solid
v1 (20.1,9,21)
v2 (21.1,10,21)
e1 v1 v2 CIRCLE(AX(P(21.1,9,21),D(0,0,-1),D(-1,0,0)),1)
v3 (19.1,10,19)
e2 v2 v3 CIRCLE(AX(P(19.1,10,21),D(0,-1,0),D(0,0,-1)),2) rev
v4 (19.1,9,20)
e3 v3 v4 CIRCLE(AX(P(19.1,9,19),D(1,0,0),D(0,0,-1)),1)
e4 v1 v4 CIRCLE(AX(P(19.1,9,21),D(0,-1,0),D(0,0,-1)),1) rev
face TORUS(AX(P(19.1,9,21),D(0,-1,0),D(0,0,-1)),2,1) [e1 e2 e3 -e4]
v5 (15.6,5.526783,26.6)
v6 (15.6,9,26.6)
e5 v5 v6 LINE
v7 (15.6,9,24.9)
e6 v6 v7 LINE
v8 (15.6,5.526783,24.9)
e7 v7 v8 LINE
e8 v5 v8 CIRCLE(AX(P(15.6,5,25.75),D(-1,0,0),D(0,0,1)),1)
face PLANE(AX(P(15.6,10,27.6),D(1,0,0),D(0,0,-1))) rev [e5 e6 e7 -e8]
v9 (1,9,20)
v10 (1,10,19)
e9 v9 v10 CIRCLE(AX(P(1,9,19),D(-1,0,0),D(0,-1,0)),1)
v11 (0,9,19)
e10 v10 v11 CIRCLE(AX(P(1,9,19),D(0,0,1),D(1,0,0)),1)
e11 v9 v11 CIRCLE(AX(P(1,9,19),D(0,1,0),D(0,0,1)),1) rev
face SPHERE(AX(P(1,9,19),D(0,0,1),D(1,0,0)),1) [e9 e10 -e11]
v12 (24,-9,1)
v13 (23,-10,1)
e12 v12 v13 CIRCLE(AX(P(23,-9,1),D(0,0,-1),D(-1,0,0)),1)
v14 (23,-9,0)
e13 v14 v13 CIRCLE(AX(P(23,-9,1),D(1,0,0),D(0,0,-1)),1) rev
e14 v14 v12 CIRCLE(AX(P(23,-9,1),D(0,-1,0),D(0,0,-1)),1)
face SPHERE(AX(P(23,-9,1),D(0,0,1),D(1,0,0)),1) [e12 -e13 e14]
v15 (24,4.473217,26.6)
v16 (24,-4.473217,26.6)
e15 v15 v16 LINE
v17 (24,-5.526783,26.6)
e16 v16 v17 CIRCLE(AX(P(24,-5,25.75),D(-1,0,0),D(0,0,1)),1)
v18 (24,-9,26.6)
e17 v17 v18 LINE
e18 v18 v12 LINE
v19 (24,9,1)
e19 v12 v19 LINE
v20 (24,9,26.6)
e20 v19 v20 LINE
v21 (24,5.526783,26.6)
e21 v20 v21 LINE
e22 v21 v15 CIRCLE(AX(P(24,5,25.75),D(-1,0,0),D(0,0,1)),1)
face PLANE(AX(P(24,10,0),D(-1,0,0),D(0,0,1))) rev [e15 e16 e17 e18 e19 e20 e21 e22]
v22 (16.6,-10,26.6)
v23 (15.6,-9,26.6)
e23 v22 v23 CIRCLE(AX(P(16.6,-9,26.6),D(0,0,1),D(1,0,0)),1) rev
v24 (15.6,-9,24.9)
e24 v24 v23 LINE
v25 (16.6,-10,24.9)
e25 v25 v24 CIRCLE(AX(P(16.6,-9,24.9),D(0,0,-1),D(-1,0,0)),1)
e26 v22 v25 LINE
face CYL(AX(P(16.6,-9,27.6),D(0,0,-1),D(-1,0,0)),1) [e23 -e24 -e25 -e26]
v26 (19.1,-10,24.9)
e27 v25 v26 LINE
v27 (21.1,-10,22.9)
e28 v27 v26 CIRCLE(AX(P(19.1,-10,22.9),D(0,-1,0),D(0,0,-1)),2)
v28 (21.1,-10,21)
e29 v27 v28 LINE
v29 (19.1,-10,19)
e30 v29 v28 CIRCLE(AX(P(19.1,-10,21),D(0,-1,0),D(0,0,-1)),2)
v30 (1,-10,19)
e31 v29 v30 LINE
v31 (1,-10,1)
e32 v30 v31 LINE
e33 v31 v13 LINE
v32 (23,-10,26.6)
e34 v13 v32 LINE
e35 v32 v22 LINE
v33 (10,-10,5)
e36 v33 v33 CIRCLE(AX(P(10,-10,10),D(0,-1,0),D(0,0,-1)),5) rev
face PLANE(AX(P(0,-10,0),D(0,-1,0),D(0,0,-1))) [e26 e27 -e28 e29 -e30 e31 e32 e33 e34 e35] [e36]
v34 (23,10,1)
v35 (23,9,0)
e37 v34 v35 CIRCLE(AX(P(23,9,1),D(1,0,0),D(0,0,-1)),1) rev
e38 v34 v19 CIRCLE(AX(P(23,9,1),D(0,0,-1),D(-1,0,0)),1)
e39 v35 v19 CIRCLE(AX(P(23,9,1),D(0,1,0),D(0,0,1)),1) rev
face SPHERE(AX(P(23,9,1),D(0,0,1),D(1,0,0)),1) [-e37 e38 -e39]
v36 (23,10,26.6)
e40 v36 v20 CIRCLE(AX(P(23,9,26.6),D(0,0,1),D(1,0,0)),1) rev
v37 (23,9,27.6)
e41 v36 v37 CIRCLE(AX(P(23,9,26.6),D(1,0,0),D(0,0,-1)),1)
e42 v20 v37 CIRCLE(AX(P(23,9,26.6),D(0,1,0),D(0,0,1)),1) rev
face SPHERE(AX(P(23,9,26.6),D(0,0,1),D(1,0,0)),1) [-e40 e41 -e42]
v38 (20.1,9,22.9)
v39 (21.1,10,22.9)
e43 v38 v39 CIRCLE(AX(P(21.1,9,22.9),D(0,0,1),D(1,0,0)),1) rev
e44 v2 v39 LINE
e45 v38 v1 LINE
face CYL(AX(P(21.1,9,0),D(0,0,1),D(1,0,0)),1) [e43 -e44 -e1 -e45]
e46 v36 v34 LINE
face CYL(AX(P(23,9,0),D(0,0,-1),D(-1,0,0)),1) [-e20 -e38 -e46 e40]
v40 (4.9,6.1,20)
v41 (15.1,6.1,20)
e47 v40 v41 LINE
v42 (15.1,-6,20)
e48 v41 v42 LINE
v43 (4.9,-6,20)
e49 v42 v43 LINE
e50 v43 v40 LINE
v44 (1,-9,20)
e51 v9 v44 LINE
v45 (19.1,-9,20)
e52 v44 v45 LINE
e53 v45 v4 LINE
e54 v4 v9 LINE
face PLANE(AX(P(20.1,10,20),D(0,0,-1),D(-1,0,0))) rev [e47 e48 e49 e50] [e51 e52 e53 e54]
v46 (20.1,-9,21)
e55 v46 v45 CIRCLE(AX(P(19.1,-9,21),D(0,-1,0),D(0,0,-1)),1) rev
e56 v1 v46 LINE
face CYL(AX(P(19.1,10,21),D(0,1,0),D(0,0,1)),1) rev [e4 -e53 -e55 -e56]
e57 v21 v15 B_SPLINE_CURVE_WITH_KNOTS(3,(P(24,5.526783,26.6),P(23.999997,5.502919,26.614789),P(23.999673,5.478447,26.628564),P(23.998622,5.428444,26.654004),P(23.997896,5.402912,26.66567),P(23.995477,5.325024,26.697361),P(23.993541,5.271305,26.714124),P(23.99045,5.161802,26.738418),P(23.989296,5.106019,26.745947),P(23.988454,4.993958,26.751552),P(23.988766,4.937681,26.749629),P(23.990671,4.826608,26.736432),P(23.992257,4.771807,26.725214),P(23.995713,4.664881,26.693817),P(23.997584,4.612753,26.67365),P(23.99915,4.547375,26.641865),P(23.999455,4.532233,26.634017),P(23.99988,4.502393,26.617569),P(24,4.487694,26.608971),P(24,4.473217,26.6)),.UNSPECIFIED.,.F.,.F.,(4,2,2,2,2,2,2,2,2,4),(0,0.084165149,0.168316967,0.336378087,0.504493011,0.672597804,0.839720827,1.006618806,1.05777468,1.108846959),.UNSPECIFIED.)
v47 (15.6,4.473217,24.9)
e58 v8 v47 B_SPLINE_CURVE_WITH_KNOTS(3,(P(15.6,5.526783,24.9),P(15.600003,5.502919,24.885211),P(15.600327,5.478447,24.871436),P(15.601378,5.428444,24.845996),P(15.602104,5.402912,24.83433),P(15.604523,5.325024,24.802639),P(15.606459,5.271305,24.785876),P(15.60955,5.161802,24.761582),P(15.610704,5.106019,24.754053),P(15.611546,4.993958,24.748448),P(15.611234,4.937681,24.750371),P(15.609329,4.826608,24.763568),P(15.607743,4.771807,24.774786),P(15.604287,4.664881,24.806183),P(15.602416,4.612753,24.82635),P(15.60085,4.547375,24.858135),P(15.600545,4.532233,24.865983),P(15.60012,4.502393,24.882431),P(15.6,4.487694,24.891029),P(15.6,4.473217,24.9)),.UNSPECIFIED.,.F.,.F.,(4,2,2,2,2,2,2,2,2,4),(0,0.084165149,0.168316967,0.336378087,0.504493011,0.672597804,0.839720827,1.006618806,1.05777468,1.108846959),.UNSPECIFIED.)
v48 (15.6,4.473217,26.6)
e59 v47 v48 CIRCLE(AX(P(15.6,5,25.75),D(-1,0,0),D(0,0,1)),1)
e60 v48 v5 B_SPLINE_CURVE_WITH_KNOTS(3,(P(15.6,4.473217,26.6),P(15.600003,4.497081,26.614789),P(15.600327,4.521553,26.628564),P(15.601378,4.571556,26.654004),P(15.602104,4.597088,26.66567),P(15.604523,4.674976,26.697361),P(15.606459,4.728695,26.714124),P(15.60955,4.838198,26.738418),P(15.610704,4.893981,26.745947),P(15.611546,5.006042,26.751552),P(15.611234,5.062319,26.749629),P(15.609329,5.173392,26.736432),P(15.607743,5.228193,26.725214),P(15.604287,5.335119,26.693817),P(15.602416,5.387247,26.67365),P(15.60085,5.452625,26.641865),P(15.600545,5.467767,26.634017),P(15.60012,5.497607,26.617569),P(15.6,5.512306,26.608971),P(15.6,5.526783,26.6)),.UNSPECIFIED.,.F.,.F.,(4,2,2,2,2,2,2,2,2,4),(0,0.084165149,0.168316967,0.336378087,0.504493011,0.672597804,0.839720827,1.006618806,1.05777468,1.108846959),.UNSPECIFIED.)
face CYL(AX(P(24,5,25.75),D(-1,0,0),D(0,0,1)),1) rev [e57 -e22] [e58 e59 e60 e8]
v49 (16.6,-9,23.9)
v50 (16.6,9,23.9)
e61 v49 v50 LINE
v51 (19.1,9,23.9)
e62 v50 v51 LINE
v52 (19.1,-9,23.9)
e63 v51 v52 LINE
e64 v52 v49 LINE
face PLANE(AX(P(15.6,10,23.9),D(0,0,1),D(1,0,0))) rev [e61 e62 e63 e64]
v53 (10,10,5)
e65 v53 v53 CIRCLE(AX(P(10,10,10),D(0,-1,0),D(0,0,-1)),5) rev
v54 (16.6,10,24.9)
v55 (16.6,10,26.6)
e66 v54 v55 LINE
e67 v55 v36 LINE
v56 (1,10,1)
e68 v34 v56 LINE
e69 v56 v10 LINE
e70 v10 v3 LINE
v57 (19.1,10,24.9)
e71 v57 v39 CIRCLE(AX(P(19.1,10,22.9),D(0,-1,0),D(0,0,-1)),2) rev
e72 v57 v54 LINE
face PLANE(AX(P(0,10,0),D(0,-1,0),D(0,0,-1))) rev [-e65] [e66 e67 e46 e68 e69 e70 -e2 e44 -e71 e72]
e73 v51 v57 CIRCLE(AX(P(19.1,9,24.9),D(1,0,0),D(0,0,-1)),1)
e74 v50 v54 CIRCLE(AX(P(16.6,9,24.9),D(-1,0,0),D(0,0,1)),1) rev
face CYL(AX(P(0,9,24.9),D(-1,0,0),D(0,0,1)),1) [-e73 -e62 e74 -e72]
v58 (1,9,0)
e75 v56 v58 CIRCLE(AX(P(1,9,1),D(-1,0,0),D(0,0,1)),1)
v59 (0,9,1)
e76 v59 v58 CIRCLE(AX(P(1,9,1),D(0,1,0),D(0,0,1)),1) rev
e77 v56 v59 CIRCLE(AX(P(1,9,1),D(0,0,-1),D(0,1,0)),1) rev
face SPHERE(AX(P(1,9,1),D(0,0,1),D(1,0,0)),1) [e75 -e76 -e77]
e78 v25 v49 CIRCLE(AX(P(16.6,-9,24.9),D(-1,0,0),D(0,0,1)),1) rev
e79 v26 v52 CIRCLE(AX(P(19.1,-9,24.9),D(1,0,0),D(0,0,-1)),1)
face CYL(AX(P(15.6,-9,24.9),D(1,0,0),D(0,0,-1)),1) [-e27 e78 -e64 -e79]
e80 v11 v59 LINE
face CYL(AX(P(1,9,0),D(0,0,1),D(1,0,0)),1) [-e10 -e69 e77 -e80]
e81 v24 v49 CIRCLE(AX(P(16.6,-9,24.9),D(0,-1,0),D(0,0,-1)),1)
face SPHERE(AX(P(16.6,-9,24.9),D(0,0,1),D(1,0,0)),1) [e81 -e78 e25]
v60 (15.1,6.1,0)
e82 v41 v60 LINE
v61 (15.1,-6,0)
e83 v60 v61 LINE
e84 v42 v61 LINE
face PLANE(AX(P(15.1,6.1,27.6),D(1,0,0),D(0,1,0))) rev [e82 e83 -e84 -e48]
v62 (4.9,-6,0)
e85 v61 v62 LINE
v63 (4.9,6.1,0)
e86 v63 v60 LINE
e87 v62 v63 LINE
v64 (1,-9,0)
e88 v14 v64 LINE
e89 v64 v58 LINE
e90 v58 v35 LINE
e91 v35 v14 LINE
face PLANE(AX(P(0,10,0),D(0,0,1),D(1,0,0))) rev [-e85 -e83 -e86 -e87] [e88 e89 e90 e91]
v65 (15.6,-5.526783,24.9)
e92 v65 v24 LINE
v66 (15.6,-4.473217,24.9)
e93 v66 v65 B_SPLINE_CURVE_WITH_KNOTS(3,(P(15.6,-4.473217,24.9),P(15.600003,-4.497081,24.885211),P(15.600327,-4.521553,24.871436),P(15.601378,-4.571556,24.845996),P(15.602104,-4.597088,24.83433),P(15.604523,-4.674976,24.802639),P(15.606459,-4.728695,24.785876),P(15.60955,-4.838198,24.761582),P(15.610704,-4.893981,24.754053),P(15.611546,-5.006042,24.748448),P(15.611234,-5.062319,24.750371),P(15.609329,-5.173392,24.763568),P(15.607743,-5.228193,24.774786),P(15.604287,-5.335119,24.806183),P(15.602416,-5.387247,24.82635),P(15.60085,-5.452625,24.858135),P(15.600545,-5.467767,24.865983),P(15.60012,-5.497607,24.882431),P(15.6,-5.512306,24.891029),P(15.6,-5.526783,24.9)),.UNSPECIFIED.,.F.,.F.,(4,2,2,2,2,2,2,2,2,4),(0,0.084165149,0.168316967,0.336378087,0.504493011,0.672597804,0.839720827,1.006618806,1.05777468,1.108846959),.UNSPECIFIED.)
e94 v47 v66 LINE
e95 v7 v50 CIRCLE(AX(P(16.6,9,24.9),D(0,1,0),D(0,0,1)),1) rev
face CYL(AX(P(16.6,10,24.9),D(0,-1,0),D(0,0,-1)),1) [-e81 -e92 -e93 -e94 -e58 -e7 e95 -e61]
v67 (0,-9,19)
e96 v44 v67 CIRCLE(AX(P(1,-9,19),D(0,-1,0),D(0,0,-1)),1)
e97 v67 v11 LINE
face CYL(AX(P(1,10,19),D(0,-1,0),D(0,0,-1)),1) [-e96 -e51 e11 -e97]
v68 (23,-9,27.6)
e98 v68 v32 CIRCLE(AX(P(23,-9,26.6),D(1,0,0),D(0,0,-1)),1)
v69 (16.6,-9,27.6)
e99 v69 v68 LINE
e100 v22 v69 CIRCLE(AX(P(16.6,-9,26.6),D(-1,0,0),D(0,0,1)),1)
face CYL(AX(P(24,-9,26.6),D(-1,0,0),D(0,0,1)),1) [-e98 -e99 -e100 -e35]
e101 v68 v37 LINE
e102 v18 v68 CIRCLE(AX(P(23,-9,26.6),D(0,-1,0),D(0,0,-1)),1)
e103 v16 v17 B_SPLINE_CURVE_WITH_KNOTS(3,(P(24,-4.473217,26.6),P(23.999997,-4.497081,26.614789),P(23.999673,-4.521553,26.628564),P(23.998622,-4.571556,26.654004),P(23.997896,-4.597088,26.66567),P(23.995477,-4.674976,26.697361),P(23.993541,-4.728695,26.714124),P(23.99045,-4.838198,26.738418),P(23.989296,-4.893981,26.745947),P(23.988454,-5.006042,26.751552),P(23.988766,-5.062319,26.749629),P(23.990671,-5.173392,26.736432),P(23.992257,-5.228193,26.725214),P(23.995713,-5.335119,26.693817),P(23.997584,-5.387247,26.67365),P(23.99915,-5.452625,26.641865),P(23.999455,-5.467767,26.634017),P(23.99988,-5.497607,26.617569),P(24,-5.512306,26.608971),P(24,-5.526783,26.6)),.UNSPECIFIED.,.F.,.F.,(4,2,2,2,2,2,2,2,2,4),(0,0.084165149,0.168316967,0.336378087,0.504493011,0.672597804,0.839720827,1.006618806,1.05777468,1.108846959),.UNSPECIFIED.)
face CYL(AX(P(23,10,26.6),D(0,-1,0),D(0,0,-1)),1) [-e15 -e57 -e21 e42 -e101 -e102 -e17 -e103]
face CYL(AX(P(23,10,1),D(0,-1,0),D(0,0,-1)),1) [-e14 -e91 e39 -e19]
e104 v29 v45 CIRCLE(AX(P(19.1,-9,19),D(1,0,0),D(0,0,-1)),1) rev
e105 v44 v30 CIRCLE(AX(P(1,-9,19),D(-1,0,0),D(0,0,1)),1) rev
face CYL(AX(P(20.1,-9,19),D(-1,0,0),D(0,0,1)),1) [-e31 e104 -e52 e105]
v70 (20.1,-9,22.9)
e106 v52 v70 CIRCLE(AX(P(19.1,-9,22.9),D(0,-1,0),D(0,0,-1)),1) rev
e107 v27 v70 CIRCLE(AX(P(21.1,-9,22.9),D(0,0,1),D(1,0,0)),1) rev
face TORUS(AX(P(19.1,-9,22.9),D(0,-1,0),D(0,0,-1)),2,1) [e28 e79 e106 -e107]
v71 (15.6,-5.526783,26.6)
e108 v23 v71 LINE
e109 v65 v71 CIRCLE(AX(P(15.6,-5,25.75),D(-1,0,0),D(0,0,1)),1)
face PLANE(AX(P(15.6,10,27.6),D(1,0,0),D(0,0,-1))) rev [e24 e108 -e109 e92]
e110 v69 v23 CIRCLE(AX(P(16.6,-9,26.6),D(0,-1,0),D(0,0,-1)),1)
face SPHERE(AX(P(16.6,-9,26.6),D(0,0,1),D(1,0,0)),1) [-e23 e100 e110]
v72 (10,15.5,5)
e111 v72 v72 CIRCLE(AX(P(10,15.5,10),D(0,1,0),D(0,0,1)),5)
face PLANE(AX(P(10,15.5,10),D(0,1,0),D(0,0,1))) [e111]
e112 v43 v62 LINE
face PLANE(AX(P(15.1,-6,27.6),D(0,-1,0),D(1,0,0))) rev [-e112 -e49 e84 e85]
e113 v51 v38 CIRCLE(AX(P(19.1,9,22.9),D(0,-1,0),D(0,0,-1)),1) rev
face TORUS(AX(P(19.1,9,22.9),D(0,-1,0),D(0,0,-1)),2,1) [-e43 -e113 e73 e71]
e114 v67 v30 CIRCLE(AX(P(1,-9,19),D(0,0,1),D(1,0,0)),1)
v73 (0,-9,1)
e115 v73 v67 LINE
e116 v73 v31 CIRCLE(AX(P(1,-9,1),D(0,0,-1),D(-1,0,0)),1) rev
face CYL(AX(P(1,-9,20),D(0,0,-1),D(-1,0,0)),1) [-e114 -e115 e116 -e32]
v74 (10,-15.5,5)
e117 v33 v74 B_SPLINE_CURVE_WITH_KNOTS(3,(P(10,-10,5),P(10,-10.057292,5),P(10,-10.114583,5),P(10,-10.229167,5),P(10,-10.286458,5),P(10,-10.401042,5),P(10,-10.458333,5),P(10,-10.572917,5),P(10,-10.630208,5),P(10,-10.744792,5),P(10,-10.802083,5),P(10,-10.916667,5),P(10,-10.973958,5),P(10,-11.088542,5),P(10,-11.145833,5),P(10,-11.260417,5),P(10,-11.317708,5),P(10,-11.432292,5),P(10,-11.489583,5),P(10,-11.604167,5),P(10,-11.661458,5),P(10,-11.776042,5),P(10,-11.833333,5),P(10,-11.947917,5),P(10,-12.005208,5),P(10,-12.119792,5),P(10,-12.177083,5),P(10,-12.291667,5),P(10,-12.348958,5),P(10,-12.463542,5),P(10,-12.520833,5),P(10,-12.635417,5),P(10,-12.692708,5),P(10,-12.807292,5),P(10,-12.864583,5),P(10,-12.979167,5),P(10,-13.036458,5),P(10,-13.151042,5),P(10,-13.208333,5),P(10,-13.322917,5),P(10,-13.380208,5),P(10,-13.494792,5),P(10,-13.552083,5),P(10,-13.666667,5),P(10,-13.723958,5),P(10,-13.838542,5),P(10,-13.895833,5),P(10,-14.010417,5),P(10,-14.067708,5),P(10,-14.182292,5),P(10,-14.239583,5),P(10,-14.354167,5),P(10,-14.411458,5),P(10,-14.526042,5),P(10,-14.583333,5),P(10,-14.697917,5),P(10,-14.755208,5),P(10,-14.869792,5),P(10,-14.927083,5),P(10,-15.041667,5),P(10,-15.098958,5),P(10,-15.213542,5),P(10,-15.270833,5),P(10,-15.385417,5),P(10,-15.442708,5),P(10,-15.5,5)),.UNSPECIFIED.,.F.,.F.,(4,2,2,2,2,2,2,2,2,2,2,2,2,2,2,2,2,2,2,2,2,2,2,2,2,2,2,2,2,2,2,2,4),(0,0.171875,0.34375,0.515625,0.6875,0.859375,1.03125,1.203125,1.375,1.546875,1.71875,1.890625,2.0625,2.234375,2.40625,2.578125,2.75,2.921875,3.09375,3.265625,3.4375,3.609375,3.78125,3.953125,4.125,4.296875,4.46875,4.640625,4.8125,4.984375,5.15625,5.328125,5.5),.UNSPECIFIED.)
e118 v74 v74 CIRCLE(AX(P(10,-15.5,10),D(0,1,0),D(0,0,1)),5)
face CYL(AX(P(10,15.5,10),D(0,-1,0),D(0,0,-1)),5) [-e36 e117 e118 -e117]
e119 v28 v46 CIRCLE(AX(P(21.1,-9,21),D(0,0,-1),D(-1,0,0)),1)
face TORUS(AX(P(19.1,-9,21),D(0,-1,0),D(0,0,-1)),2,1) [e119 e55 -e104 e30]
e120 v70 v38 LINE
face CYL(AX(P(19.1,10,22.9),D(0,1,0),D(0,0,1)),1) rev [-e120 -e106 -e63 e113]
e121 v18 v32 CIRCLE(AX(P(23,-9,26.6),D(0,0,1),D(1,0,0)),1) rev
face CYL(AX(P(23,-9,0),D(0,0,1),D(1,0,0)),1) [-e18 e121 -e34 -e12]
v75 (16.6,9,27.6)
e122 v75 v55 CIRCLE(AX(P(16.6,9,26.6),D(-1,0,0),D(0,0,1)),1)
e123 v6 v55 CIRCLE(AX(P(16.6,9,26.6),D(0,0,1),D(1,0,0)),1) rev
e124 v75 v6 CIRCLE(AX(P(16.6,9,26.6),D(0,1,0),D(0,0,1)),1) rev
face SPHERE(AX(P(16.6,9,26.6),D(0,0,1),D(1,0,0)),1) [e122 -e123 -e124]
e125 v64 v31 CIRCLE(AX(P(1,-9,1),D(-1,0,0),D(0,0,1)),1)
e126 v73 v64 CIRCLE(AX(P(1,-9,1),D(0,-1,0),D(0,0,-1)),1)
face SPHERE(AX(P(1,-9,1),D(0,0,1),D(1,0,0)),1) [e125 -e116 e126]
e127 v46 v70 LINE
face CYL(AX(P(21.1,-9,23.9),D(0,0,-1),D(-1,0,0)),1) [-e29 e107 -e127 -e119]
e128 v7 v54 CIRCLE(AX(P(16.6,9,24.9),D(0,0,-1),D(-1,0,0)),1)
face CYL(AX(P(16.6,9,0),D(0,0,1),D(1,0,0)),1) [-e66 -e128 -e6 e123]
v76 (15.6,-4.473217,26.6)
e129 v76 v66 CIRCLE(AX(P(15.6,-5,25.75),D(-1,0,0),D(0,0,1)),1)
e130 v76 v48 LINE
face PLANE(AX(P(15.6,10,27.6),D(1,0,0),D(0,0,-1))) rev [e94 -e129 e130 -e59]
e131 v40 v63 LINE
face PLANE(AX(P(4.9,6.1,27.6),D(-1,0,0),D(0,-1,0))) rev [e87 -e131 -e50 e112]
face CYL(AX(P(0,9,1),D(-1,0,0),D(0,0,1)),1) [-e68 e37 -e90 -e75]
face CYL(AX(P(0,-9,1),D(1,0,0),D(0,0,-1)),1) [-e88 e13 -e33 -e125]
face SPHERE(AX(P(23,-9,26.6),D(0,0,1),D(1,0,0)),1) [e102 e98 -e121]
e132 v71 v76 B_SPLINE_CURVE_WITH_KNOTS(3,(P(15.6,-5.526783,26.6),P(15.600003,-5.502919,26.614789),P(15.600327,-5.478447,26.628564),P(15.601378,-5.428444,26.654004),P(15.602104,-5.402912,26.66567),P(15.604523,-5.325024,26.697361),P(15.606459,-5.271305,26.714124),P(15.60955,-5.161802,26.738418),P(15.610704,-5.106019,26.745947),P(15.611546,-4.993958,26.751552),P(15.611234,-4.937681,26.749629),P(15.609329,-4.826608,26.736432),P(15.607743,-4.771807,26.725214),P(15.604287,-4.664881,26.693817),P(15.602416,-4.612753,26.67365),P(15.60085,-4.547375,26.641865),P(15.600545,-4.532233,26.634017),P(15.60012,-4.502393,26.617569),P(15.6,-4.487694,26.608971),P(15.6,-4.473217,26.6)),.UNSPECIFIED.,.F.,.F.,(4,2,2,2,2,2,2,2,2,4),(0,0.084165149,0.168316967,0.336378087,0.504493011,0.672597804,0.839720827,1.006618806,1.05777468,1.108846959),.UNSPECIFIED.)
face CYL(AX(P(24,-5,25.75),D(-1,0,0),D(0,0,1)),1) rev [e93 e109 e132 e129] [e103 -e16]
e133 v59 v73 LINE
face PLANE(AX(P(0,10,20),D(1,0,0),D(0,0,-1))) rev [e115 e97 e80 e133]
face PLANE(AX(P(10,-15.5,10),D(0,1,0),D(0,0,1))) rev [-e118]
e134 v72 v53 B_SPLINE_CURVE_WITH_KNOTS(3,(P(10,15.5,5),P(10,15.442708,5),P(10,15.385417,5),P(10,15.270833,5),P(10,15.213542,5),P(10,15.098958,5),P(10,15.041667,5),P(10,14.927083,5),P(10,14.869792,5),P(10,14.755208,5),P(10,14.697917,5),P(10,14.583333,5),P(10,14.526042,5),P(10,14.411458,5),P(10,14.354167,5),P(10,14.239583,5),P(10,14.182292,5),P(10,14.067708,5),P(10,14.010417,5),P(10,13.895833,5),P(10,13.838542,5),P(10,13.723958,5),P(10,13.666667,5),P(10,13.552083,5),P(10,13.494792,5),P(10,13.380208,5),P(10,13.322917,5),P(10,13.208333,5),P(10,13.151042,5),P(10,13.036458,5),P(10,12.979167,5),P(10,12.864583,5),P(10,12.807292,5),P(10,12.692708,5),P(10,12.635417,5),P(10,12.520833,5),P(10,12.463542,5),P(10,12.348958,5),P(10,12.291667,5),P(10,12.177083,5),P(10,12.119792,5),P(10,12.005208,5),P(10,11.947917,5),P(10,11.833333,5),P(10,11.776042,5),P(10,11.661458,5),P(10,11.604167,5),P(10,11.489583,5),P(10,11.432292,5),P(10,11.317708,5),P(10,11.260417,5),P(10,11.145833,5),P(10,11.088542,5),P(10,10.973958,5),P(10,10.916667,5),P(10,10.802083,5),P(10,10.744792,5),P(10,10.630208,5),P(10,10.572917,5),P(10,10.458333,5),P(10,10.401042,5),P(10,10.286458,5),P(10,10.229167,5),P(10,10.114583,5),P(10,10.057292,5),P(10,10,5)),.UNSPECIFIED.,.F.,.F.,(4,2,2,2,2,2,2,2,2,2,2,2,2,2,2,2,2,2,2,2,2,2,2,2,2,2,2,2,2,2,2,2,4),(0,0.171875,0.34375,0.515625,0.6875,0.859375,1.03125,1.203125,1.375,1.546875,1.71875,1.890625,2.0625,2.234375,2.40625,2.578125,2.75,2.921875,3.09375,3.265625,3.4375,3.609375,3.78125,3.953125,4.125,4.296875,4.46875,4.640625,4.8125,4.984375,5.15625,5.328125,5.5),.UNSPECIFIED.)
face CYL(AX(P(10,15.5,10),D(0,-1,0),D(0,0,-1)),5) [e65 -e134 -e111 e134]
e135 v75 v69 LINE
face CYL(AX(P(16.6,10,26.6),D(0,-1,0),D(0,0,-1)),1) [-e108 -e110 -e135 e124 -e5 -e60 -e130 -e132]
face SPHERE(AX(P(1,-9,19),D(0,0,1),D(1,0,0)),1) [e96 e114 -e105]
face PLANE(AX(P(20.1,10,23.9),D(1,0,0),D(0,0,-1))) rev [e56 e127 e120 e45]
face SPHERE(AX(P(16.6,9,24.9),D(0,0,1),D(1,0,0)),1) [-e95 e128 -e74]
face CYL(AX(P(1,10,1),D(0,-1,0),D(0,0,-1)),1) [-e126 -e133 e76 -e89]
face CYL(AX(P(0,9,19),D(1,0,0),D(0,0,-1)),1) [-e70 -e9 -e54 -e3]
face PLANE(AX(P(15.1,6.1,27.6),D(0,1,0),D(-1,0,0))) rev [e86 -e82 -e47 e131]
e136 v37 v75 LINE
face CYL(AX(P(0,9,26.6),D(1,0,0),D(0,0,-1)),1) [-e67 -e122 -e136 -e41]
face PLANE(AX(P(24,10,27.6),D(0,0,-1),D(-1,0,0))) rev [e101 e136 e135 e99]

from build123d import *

# Parameters (mm, degrees)
EXTRUDE_1_DEPTH     = 10
SKETCH_3_R          = 5
EXTRUDE_2_DEPTH     = 15.5
SKETCH_2_W          = 10.2
SKETCH_2_H          = 12.1
CUT_EXTRUDE_1_DEPTH = 40.724174
SKETCH_4_R          = 1
CUT_EXTRUDE_2_DEPTH = 36.289800226
FILLET_1_R          = 1


with BuildPart() as part:
    # 草图1 → 凸台-拉伸1 (new, symmetric)
    with BuildSketch(Plane(origin=(0, 0, 0), x_dir=(1, 0, 0), z_dir=(0, 1, 0))):
        Polygon((0, 0), (24, 0), (24, -27.6), (15.6, -27.6), (15.6, -23.9), (20.1, -23.9), (20.1, -20), (0, -20), align=None)
    extrude(amount=EXTRUDE_1_DEPTH, both=True)

    # 草图3 → 凸台-拉伸2 (add, symmetric)
    with BuildSketch(Plane(origin=(0, 0, 0), x_dir=(1, 0, 0), z_dir=(0, 1, 0))):
        with Locations(Location((10, -10, 0), (0, 0, 90))):
            Circle(SKETCH_3_R)
    extrude(amount=EXTRUDE_2_DEPTH, both=True)

    # 草图2 → 切除-拉伸1 (cut, through all)
    with BuildSketch(Plane(origin=(0, 0, 0), x_dir=(-1, 0, 0), z_dir=(0, 0, -1))):
        with Locations((-10, 0.05)):
            Rectangle(SKETCH_2_W, SKETCH_2_H)
    extrude(amount=-CUT_EXTRUDE_1_DEPTH, mode=Mode.SUBTRACT)

    # 草图4 → 切除-拉伸2 (cut, through all)
    with BuildSketch(Plane.ZY.offset(-15.6)):
        with Locations((25.75, 5)):
            Circle(SKETCH_4_R)
        with Locations((25.75, -5)):
            Circle(SKETCH_4_R)
    extrude(amount=-CUT_EXTRUDE_2_DEPTH, mode=Mode.SUBTRACT)

    # 圆角1
    # the kernel refuses this fillet: 1 mm, written as the material it adds along each edge
    with BuildSketch(Plane(origin=(20.1, 10, 23.9), x_dir=(0, 0, -1), z_dir=(0, -1, 0))) as fillet_1_piece_1:
        with BuildLine():
            CenterArc((FILLET_1_R, -FILLET_1_R), FILLET_1_R, 90, 90)
            Line((0, -FILLET_1_R), (0, 0))
            Line((0, 0), (FILLET_1_R, 0))
        make_face()
    extrude(amount=20)
    with BuildSketch(Plane(origin=(20.1, -10, 20), x_dir=(-1, 0, 0), z_dir=(0, 1, 0))) as fillet_1_piece_2:
        with BuildLine():
            CenterArc((FILLET_1_R, FILLET_1_R), FILLET_1_R, 180, 90)
            Line((0, FILLET_1_R), (0, 0))
            Line((0, 0), (FILLET_1_R, 0))
        make_face()
    extrude(amount=20)
    # the kernel refuses this fillet: 1 mm, written as the material it takes off along each edge
    with BuildSketch(Plane(origin=(1, -9, 1), x_dir=(-1, 0, 0), z_dir=(0, 0, -1))) as fillet_1_2_piece_1_section:
        Polygon((0, 0), (FILLET_1_R, 0), (FILLET_1_R, -FILLET_1_R), (0, -FILLET_1_R), align=None)
    fillet_1_2_piece_1 = extrude(amount=FILLET_1_R, mode=Mode.PRIVATE)
    fillet_1_2_piece_1 = fillet_1_2_piece_1 - Plane(origin=(1, -9, 1), x_dir=(0.7071067811865475, 0.7071067811865475, 0), z_dir=(0, 0, -1)) * Sphere(FILLET_1_R, mode=Mode.PRIVATE)
    add(fillet_1_2_piece_1, mode=Mode.SUBTRACT)
    with BuildSketch(Plane(origin=(1, 9, 1), x_dir=(-1, 0, 0), z_dir=(0, 0, -1))) as fillet_1_2_piece_2_section:
        Polygon((0, 0), (FILLET_1_R, 0), (FILLET_1_R, FILLET_1_R), (0, FILLET_1_R), align=None)
    fillet_1_2_piece_2 = extrude(amount=FILLET_1_R, mode=Mode.PRIVATE)
    fillet_1_2_piece_2 = fillet_1_2_piece_2 - Plane(origin=(1, 9, 1), x_dir=(0.7071067811865475, -0.7071067811865475, 0), z_dir=(0, 0, -1)) * Sphere(FILLET_1_R, mode=Mode.PRIVATE)
    add(fillet_1_2_piece_2, mode=Mode.SUBTRACT)
    with BuildSketch(Plane(origin=(23, 9, 1), x_dir=(0, 1, 0), z_dir=(0, 0, -1))) as fillet_1_2_piece_3_section:
        Polygon((0, 0), (FILLET_1_R, 0), (FILLET_1_R, FILLET_1_R), (0, FILLET_1_R), align=None)
    fillet_1_2_piece_3 = extrude(amount=FILLET_1_R, mode=Mode.PRIVATE)
    fillet_1_2_piece_3 = fillet_1_2_piece_3 - Plane(origin=(23, 9, 1), x_dir=(-0.7071067811865475, -0.7071067811865475, 0), z_dir=(0, 0, -1)) * Sphere(FILLET_1_R, mode=Mode.PRIVATE)
    add(fillet_1_2_piece_3, mode=Mode.SUBTRACT)
    with BuildSketch(Plane(origin=(23, -9, 1), x_dir=(0, -1, 0), z_dir=(0, 0, -1))) as fillet_1_2_piece_4_section:
        Polygon((0, 0), (FILLET_1_R, 0), (FILLET_1_R, -FILLET_1_R), (0, -FILLET_1_R), align=None)
    fillet_1_2_piece_4 = extrude(amount=FILLET_1_R, mode=Mode.PRIVATE)
    fillet_1_2_piece_4 = fillet_1_2_piece_4 - Plane(origin=(23, -9, 1), x_dir=(-0.7071067811865475, 0.7071067811865475, 0), z_dir=(0, 0, -1)) * Sphere(FILLET_1_R, mode=Mode.PRIVATE)
    add(fillet_1_2_piece_4, mode=Mode.SUBTRACT)
    with BuildSketch(Plane(origin=(23, 9, 26.6), x_dir=(0, 1, 0), z_dir=(0, 0, 1))) as fillet_1_2_piece_5_section:
        Polygon((0, 0), (FILLET_1_R, 0), (FILLET_1_R, -FILLET_1_R), (0, -FILLET_1_R), align=None)
    fillet_1_2_piece_5 = extrude(amount=FILLET_1_R, mode=Mode.PRIVATE)
    fillet_1_2_piece_5 = fillet_1_2_piece_5 - Plane(origin=(23, 9, 26.6), x_dir=(-0.7071067811865475, -0.7071067811865475, 0), z_dir=(0, 0, 1)) * Sphere(FILLET_1_R, mode=Mode.PRIVATE)
    add(fillet_1_2_piece_5, mode=Mode.SUBTRACT)
    with BuildSketch(Plane(origin=(23, -9, 26.6), x_dir=(0, -1, 0), z_dir=(0, 0, 1))) as fillet_1_2_piece_6_section:
        Polygon((0, 0), (FILLET_1_R, 0), (FILLET_1_R, FILLET_1_R), (0, FILLET_1_R), align=None)
    fillet_1_2_piece_6 = extrude(amount=FILLET_1_R, mode=Mode.PRIVATE)
    fillet_1_2_piece_6 = fillet_1_2_piece_6 - Plane(origin=(23, -9, 26.6), x_dir=(-0.7071067811865475, 0.7071067811865475, 0), z_dir=(0, 0, 1)) * Sphere(FILLET_1_R, mode=Mode.PRIVATE)
    add(fillet_1_2_piece_6, mode=Mode.SUBTRACT)
    with BuildSketch(Plane(origin=(16.6, 9, 26.6), x_dir=(0, 1, 0), z_dir=(0, 0, 1))) as fillet_1_2_piece_7_section:
        Polygon((0, 0), (FILLET_1_R, 0), (FILLET_1_R, FILLET_1_R), (0, FILLET_1_R), align=None)
    fillet_1_2_piece_7 = extrude(amount=FILLET_1_R, mode=Mode.PRIVATE)
    fillet_1_2_piece_7 = fillet_1_2_piece_7 - Plane(origin=(16.6, 9, 26.6), x_dir=(0.7071067811865475, -0.7071067811865475, 0), z_dir=(0, 0, 1)) * Sphere(FILLET_1_R, mode=Mode.PRIVATE)
    add(fillet_1_2_piece_7, mode=Mode.SUBTRACT)
    with BuildSketch(Plane(origin=(16.6, -9, 26.6), x_dir=(0, -1, 0), z_dir=(0, 0, 1))) as fillet_1_2_piece_8_section:
        Polygon((0, 0), (FILLET_1_R, 0), (FILLET_1_R, -FILLET_1_R), (0, -FILLET_1_R), align=None)
    fillet_1_2_piece_8 = extrude(amount=FILLET_1_R, mode=Mode.PRIVATE)
    fillet_1_2_piece_8 = fillet_1_2_piece_8 - Plane(origin=(16.6, -9, 26.6), x_dir=(0.7071067811865475, 0.7071067811865475, 0), z_dir=(0, 0, 1)) * Sphere(FILLET_1_R, mode=Mode.PRIVATE)
    add(fillet_1_2_piece_8, mode=Mode.SUBTRACT)
    with BuildSketch(Plane(origin=(0, -10, 22.5), x_dir=(0, 1, 0), z_dir=(0, 0, -1))) as fillet_1_2_piece_9:
        with BuildLine():
            CenterArc((FILLET_1_R, FILLET_1_R), FILLET_1_R, 180, 90)
            Line((0, FILLET_1_R), (0, 0))
            Line((0, 0), (FILLET_1_R, 0))
        make_face()
    extrude(amount=21.5, mode=Mode.SUBTRACT)
    with BuildSketch(Plane(origin=(0, -9, 0), x_dir=(1, 0, 0), z_dir=(0, 1, 0)), Plane(origin=(24, 9, 0), x_dir=(-1, 0, 0), z_dir=(0, -1, 0)), Plane(origin=(24, 9, 27.6), x_dir=(0, 0, -1), z_dir=(0, -1, 0)), Plane(origin=(15.6, 9, 27.6), x_dir=(1, 0, 0), z_dir=(0, -1, 0))) as fillet_1_2_piece_10:
        with BuildLine():
            CenterArc((FILLET_1_R, -FILLET_1_R), FILLET_1_R, 90, 90)
            Line((0, -FILLET_1_R), (0, 0))
            Line((0, 0), (FILLET_1_R, 0))
        make_face()
    extrude(amount=18, mode=Mode.SUBTRACT)
    with BuildSketch(Plane(origin=(15.6, 12.5, 23.9), x_dir=(0, 0, 1), z_dir=(0, -1, 0)), Plane(origin=(0, -12.5, 20), x_dir=(0, 0, -1), z_dir=(0, 1, 0))) as fillet_1_2_piece_11:
        with BuildLine():
            CenterArc((FILLET_1_R, -FILLET_1_R), FILLET_1_R, 90, 90)
            Line((0, -FILLET_1_R), (0, 0))
            Line((0, 0), (FILLET_1_R, 0))
        make_face()
    extrude(amount=25, mode=Mode.SUBTRACT)
    with BuildSketch(Plane(origin=(15.6, 10, 26.6), x_dir=(1, 0, 0), z_dir=(0, 0, -1))) as fillet_1_2_piece_12:
        with BuildLine():
            CenterArc((FILLET_1_R, FILLET_1_R), FILLET_1_R, 180, 90)
            Line((0, FILLET_1_R), (0, 0))
            Line((0, 0), (FILLET_1_R, 0))
        make_face()
    extrude(amount=5.2, mode=Mode.SUBTRACT)
    with BuildSketch(Plane(origin=(23, 10, 27.6), x_dir=(0, 0, -1), z_dir=(-1, 0, 0))) as fillet_1_2_piece_13:
        with BuildLine():
            CenterArc((FILLET_1_R, FILLET_1_R), FILLET_1_R, 180, 90)
            Line((0, FILLET_1_R), (0, 0))
            Line((0, 0), (FILLET_1_R, 0))
        make_face()
    extrude(amount=6.4, mode=Mode.SUBTRACT)
    with BuildSketch(Plane(origin=(24, 10, 1), x_dir=(-1, 0, 0), z_dir=(0, 0, 1))) as fillet_1_2_piece_14:
        with BuildLine():
            CenterArc((FILLET_1_R, FILLET_1_R), FILLET_1_R, 180, 90)
            Line((0, FILLET_1_R), (0, 0))
            Line((0, 0), (FILLET_1_R, 0))
        make_face()
    extrude(amount=25.6, mode=Mode.SUBTRACT)
    with BuildSketch(Plane(origin=(1, 10, 0), x_dir=(0, -1, 0), z_dir=(1, 0, 0))) as fillet_1_2_piece_15:
        with BuildLine():
            CenterArc((FILLET_1_R, -FILLET_1_R), FILLET_1_R, 90, 90)
            Line((0, -FILLET_1_R), (0, 0))
            Line((0, 0), (FILLET_1_R, 0))
        make_face()
    extrude(amount=22, mode=Mode.SUBTRACT)
    with BuildSketch(Plane(origin=(0, 10, 22.5), x_dir=(0, -1, 0), z_dir=(0, 0, -1))) as fillet_1_2_piece_16:
        with BuildLine():
            CenterArc((FILLET_1_R, -FILLET_1_R), FILLET_1_R, 90, 90)
            Line((0, -FILLET_1_R), (0, 0))
            Line((0, 0), (FILLET_1_R, 0))
        make_face()
    extrude(amount=21.5, mode=Mode.SUBTRACT)
    with BuildSketch(Plane(origin=(1, -10, 0), x_dir=(0, 1, 0), z_dir=(1, 0, 0))) as fillet_1_2_piece_17:
        with BuildLine():
            CenterArc((FILLET_1_R, FILLET_1_R), FILLET_1_R, 180, 90)
            Line((0, FILLET_1_R), (0, 0))
            Line((0, 0), (FILLET_1_R, 0))
        make_face()
    extrude(amount=22, mode=Mode.SUBTRACT)
    with BuildSketch(Plane(origin=(24, -10, 1), x_dir=(-1, 0, 0), z_dir=(0, 0, 1))) as fillet_1_2_piece_18:
        with BuildLine():
            CenterArc((FILLET_1_R, -FILLET_1_R), FILLET_1_R, 90, 90)
            Line((0, -FILLET_1_R), (0, 0))
            Line((0, 0), (FILLET_1_R, 0))
        make_face()
    extrude(amount=25.6, mode=Mode.SUBTRACT)
    with BuildSketch(Plane(origin=(23, -10, 27.6), x_dir=(0, 0, -1), z_dir=(-1, 0, 0))) as fillet_1_2_piece_19:
        with BuildLine():
            CenterArc((FILLET_1_R, -FILLET_1_R), FILLET_1_R, 90, 90)
            Line((0, -FILLET_1_R), (0, 0))
            Line((0, 0), (FILLET_1_R, 0))
        make_face()
    extrude(amount=6.4, mode=Mode.SUBTRACT)
    with BuildSketch(Plane(origin=(15.6, -10, 26.6), x_dir=(1, 0, 0), z_dir=(0, 0, -1))) as fillet_1_2_piece_20:
        with BuildLine():
            CenterArc((FILLET_1_R, -FILLET_1_R), FILLET_1_R, 90, 90)
            Line((0, -FILLET_1_R), (0, 0))
            Line((0, 0), (FILLET_1_R, 0))
        make_face()
    extrude(amount=5.2, mode=Mode.SUBTRACT)
    # the kernel refuses this fillet: 1 mm, written as the material it takes off along each edge
    with BuildSketch(Plane(origin=(1, 9, 19), x_dir=(0, 0, 1), z_dir=(0, 1, 0))) as fillet_1_3_piece_1_section:
        Polygon((0, 0), (FILLET_1_R, 0), (FILLET_1_R, -FILLET_1_R), (0, -FILLET_1_R), align=None)
    fillet_1_3_piece_1 = extrude(amount=FILLET_1_R, mode=Mode.PRIVATE)
    fillet_1_3_piece_1 = fillet_1_3_piece_1 - Plane(origin=(1, 9, 19), x_dir=(0.7071067811865475, 0, -0.7071067811865476), z_dir=(0, 1, 0)) * Sphere(FILLET_1_R, mode=Mode.PRIVATE)
    add(fillet_1_3_piece_1, mode=Mode.SUBTRACT)
    with BuildSketch(Plane(origin=(16.6, 9, 24.9), x_dir=(0, 0, -1), z_dir=(0, 1, 0))) as fillet_1_3_piece_2_section:
        Polygon((0, 0), (FILLET_1_R, 0), (FILLET_1_R, FILLET_1_R), (0, FILLET_1_R), align=None)
    fillet_1_3_piece_2 = extrude(amount=FILLET_1_R, mode=Mode.PRIVATE)
    fillet_1_3_piece_2 = fillet_1_3_piece_2 - Plane(origin=(16.6, 9, 24.9), x_dir=(0.7071067811865475, 0, 0.7071067811865475), z_dir=(0, 1, 0)) * Sphere(FILLET_1_R, mode=Mode.PRIVATE)
    add(fillet_1_3_piece_2, mode=Mode.SUBTRACT)
    with BuildSketch(Plane(origin=(1, -9, 19), x_dir=(0, 0, 1), z_dir=(0, -1, 0))) as fillet_1_3_piece_3_section:
        Polygon((0, 0), (FILLET_1_R, 0), (FILLET_1_R, FILLET_1_R), (0, FILLET_1_R), align=None)
    fillet_1_3_piece_3 = extrude(amount=FILLET_1_R, mode=Mode.PRIVATE)
    fillet_1_3_piece_3 = fillet_1_3_piece_3 - Plane(origin=(1, -9, 19), x_dir=(0.7071067811865475, 0, -0.7071067811865476), z_dir=(0, -1, 0)) * Sphere(FILLET_1_R, mode=Mode.PRIVATE)
    add(fillet_1_3_piece_3, mode=Mode.SUBTRACT)
    with BuildSketch(Plane(origin=(16.6, -9, 24.9), x_dir=(0, 0, -1), z_dir=(0, -1, 0))) as fillet_1_3_piece_4_section:
        Polygon((0, 0), (FILLET_1_R, 0), (FILLET_1_R, -FILLET_1_R), (0, -FILLET_1_R), align=None)
    fillet_1_3_piece_4 = extrude(amount=FILLET_1_R, mode=Mode.PRIVATE)
    fillet_1_3_piece_4 = fillet_1_3_piece_4 - Plane(origin=(16.6, -9, 24.9), x_dir=(0.7071067811865475, 0, 0.7071067811865475), z_dir=(0, -1, 0)) * Sphere(FILLET_1_R, mode=Mode.PRIVATE)
    add(fillet_1_3_piece_4, mode=Mode.SUBTRACT)
    with BuildSketch(Plane(origin=(16.6, -10, 23.9), x_dir=(0, 0, 1), z_dir=(1, 0, 0))) as fillet_1_3_piece_5:
        with BuildLine():
            CenterArc((FILLET_1_R, -FILLET_1_R), FILLET_1_R, 90, 90)
            Line((0, -FILLET_1_R), (0, 0))
            Line((0, 0), (FILLET_1_R, 0))
        make_face()
    extrude(amount=2.5, mode=Mode.SUBTRACT)
    with BuildSketch(Plane(origin=(20.1, -10, 22.9), x_dir=(1, 0, 0), z_dir=(0, 0, -1))) as fillet_1_3_piece_6:
        with BuildLine():
            CenterArc((FILLET_1_R, -FILLET_1_R), FILLET_1_R, 90, 90)
            Line((0, -FILLET_1_R), (0, 0))
            Line((0, 0), (FILLET_1_R, 0))
        make_face()
    extrude(amount=1.9, mode=Mode.SUBTRACT)
    with BuildSketch(Plane(origin=(19.1, -10, 20), x_dir=(0, 0, -1), z_dir=(-1, 0, 0))) as fillet_1_3_piece_7:
        with BuildLine():
            CenterArc((FILLET_1_R, -FILLET_1_R), FILLET_1_R, 90, 90)
            Line((0, -FILLET_1_R), (0, 0))
            Line((0, 0), (FILLET_1_R, 0))
        make_face()
    extrude(amount=18.1, mode=Mode.SUBTRACT)
    with BuildSketch(Plane(origin=(20.1, 10, 22.9), x_dir=(1, 0, 0), z_dir=(0, 0, -1))) as fillet_1_3_piece_8:
        with BuildLine():
            CenterArc((FILLET_1_R, FILLET_1_R), FILLET_1_R, 180, 90)
            Line((0, FILLET_1_R), (0, 0))
            Line((0, 0), (FILLET_1_R, 0))
        make_face()
    extrude(amount=1.9, mode=Mode.SUBTRACT)
    with BuildSketch(Plane(origin=(16.6, 10, 23.9), x_dir=(0, 0, 1), z_dir=(1, 0, 0))) as fillet_1_3_piece_9:
        with BuildLine():
            CenterArc((FILLET_1_R, FILLET_1_R), FILLET_1_R, 180, 90)
            Line((0, FILLET_1_R), (0, 0))
            Line((0, 0), (FILLET_1_R, 0))
        make_face()
    extrude(amount=2.5, mode=Mode.SUBTRACT)
    with BuildSketch(Plane(origin=(19.1, 10, 20), x_dir=(0, 0, -1), z_dir=(-1, 0, 0))) as fillet_1_3_piece_10:
        with BuildLine():
            CenterArc((FILLET_1_R, FILLET_1_R), FILLET_1_R, 180, 90)
            Line((0, FILLET_1_R), (0, 0))
            Line((0, 0), (FILLET_1_R, 0))
        make_face()
    extrude(amount=18.1, mode=Mode.SUBTRACT)
    with BuildSketch(Plane(origin=(19.1, 10, 21), x_dir=(0, 0, -1), z_dir=(-1, 0, 0))) as fillet_1_3_piece_11:
        with BuildLine():
            CenterArc((1 + FILLET_1_R, FILLET_1_R), FILLET_1_R, 180, 90)
            Line((1, FILLET_1_R), (1, 0))
            Line((1, 0), (1 + FILLET_1_R, 0))
        make_face()
    revolve(axis=Axis((19.1, 10, 21), (0, -1, 0)), revolution_arc=90, mode=Mode.SUBTRACT)
    with BuildSketch(Plane(origin=(19.1, 10, 22.9), x_dir=(1, 0, 0), z_dir=(0, 0, -1))) as fillet_1_3_piece_12:
        with BuildLine():
            CenterArc((1 + FILLET_1_R, FILLET_1_R), FILLET_1_R, 180, 90)
            Line((1, FILLET_1_R), (1, 0))
            Line((1, 0), (1 + FILLET_1_R, 0))
        make_face()
    revolve(axis=Axis((19.1, 10, 22.9), (0, -1, 0)), revolution_arc=90, mode=Mode.SUBTRACT)
    with BuildSketch(Plane(origin=(19.1, -10, 21), x_dir=(0, 0, -1), z_dir=(-1, 0, 0))) as fillet_1_3_piece_13:
        with BuildLine():
            CenterArc((1 + FILLET_1_R, -FILLET_1_R), FILLET_1_R, 90, 90)
            Line((1, -FILLET_1_R), (1, 0))
            Line((1, 0), (1 + FILLET_1_R, 0))
        make_face()
    revolve(axis=Axis((19.1, -10, 21), (0, -1, 0)), revolution_arc=90, mode=Mode.SUBTRACT)
    with BuildSketch(Plane(origin=(19.1, -10, 22.9), x_dir=(1, 0, 0), z_dir=(0, 0, -1))) as fillet_1_3_piece_14:
        with BuildLine():
            CenterArc((1 + FILLET_1_R, -FILLET_1_R), FILLET_1_R, 90, 90)
            Line((1, -FILLET_1_R), (1, 0))
            Line((1, 0), (1 + FILLET_1_R, 0))
        make_face()
    revolve(axis=Axis((19.1, -10, 22.9), (0, -1, 0)), revolution_arc=90, mode=Mode.SUBTRACT)


solid = part.part
